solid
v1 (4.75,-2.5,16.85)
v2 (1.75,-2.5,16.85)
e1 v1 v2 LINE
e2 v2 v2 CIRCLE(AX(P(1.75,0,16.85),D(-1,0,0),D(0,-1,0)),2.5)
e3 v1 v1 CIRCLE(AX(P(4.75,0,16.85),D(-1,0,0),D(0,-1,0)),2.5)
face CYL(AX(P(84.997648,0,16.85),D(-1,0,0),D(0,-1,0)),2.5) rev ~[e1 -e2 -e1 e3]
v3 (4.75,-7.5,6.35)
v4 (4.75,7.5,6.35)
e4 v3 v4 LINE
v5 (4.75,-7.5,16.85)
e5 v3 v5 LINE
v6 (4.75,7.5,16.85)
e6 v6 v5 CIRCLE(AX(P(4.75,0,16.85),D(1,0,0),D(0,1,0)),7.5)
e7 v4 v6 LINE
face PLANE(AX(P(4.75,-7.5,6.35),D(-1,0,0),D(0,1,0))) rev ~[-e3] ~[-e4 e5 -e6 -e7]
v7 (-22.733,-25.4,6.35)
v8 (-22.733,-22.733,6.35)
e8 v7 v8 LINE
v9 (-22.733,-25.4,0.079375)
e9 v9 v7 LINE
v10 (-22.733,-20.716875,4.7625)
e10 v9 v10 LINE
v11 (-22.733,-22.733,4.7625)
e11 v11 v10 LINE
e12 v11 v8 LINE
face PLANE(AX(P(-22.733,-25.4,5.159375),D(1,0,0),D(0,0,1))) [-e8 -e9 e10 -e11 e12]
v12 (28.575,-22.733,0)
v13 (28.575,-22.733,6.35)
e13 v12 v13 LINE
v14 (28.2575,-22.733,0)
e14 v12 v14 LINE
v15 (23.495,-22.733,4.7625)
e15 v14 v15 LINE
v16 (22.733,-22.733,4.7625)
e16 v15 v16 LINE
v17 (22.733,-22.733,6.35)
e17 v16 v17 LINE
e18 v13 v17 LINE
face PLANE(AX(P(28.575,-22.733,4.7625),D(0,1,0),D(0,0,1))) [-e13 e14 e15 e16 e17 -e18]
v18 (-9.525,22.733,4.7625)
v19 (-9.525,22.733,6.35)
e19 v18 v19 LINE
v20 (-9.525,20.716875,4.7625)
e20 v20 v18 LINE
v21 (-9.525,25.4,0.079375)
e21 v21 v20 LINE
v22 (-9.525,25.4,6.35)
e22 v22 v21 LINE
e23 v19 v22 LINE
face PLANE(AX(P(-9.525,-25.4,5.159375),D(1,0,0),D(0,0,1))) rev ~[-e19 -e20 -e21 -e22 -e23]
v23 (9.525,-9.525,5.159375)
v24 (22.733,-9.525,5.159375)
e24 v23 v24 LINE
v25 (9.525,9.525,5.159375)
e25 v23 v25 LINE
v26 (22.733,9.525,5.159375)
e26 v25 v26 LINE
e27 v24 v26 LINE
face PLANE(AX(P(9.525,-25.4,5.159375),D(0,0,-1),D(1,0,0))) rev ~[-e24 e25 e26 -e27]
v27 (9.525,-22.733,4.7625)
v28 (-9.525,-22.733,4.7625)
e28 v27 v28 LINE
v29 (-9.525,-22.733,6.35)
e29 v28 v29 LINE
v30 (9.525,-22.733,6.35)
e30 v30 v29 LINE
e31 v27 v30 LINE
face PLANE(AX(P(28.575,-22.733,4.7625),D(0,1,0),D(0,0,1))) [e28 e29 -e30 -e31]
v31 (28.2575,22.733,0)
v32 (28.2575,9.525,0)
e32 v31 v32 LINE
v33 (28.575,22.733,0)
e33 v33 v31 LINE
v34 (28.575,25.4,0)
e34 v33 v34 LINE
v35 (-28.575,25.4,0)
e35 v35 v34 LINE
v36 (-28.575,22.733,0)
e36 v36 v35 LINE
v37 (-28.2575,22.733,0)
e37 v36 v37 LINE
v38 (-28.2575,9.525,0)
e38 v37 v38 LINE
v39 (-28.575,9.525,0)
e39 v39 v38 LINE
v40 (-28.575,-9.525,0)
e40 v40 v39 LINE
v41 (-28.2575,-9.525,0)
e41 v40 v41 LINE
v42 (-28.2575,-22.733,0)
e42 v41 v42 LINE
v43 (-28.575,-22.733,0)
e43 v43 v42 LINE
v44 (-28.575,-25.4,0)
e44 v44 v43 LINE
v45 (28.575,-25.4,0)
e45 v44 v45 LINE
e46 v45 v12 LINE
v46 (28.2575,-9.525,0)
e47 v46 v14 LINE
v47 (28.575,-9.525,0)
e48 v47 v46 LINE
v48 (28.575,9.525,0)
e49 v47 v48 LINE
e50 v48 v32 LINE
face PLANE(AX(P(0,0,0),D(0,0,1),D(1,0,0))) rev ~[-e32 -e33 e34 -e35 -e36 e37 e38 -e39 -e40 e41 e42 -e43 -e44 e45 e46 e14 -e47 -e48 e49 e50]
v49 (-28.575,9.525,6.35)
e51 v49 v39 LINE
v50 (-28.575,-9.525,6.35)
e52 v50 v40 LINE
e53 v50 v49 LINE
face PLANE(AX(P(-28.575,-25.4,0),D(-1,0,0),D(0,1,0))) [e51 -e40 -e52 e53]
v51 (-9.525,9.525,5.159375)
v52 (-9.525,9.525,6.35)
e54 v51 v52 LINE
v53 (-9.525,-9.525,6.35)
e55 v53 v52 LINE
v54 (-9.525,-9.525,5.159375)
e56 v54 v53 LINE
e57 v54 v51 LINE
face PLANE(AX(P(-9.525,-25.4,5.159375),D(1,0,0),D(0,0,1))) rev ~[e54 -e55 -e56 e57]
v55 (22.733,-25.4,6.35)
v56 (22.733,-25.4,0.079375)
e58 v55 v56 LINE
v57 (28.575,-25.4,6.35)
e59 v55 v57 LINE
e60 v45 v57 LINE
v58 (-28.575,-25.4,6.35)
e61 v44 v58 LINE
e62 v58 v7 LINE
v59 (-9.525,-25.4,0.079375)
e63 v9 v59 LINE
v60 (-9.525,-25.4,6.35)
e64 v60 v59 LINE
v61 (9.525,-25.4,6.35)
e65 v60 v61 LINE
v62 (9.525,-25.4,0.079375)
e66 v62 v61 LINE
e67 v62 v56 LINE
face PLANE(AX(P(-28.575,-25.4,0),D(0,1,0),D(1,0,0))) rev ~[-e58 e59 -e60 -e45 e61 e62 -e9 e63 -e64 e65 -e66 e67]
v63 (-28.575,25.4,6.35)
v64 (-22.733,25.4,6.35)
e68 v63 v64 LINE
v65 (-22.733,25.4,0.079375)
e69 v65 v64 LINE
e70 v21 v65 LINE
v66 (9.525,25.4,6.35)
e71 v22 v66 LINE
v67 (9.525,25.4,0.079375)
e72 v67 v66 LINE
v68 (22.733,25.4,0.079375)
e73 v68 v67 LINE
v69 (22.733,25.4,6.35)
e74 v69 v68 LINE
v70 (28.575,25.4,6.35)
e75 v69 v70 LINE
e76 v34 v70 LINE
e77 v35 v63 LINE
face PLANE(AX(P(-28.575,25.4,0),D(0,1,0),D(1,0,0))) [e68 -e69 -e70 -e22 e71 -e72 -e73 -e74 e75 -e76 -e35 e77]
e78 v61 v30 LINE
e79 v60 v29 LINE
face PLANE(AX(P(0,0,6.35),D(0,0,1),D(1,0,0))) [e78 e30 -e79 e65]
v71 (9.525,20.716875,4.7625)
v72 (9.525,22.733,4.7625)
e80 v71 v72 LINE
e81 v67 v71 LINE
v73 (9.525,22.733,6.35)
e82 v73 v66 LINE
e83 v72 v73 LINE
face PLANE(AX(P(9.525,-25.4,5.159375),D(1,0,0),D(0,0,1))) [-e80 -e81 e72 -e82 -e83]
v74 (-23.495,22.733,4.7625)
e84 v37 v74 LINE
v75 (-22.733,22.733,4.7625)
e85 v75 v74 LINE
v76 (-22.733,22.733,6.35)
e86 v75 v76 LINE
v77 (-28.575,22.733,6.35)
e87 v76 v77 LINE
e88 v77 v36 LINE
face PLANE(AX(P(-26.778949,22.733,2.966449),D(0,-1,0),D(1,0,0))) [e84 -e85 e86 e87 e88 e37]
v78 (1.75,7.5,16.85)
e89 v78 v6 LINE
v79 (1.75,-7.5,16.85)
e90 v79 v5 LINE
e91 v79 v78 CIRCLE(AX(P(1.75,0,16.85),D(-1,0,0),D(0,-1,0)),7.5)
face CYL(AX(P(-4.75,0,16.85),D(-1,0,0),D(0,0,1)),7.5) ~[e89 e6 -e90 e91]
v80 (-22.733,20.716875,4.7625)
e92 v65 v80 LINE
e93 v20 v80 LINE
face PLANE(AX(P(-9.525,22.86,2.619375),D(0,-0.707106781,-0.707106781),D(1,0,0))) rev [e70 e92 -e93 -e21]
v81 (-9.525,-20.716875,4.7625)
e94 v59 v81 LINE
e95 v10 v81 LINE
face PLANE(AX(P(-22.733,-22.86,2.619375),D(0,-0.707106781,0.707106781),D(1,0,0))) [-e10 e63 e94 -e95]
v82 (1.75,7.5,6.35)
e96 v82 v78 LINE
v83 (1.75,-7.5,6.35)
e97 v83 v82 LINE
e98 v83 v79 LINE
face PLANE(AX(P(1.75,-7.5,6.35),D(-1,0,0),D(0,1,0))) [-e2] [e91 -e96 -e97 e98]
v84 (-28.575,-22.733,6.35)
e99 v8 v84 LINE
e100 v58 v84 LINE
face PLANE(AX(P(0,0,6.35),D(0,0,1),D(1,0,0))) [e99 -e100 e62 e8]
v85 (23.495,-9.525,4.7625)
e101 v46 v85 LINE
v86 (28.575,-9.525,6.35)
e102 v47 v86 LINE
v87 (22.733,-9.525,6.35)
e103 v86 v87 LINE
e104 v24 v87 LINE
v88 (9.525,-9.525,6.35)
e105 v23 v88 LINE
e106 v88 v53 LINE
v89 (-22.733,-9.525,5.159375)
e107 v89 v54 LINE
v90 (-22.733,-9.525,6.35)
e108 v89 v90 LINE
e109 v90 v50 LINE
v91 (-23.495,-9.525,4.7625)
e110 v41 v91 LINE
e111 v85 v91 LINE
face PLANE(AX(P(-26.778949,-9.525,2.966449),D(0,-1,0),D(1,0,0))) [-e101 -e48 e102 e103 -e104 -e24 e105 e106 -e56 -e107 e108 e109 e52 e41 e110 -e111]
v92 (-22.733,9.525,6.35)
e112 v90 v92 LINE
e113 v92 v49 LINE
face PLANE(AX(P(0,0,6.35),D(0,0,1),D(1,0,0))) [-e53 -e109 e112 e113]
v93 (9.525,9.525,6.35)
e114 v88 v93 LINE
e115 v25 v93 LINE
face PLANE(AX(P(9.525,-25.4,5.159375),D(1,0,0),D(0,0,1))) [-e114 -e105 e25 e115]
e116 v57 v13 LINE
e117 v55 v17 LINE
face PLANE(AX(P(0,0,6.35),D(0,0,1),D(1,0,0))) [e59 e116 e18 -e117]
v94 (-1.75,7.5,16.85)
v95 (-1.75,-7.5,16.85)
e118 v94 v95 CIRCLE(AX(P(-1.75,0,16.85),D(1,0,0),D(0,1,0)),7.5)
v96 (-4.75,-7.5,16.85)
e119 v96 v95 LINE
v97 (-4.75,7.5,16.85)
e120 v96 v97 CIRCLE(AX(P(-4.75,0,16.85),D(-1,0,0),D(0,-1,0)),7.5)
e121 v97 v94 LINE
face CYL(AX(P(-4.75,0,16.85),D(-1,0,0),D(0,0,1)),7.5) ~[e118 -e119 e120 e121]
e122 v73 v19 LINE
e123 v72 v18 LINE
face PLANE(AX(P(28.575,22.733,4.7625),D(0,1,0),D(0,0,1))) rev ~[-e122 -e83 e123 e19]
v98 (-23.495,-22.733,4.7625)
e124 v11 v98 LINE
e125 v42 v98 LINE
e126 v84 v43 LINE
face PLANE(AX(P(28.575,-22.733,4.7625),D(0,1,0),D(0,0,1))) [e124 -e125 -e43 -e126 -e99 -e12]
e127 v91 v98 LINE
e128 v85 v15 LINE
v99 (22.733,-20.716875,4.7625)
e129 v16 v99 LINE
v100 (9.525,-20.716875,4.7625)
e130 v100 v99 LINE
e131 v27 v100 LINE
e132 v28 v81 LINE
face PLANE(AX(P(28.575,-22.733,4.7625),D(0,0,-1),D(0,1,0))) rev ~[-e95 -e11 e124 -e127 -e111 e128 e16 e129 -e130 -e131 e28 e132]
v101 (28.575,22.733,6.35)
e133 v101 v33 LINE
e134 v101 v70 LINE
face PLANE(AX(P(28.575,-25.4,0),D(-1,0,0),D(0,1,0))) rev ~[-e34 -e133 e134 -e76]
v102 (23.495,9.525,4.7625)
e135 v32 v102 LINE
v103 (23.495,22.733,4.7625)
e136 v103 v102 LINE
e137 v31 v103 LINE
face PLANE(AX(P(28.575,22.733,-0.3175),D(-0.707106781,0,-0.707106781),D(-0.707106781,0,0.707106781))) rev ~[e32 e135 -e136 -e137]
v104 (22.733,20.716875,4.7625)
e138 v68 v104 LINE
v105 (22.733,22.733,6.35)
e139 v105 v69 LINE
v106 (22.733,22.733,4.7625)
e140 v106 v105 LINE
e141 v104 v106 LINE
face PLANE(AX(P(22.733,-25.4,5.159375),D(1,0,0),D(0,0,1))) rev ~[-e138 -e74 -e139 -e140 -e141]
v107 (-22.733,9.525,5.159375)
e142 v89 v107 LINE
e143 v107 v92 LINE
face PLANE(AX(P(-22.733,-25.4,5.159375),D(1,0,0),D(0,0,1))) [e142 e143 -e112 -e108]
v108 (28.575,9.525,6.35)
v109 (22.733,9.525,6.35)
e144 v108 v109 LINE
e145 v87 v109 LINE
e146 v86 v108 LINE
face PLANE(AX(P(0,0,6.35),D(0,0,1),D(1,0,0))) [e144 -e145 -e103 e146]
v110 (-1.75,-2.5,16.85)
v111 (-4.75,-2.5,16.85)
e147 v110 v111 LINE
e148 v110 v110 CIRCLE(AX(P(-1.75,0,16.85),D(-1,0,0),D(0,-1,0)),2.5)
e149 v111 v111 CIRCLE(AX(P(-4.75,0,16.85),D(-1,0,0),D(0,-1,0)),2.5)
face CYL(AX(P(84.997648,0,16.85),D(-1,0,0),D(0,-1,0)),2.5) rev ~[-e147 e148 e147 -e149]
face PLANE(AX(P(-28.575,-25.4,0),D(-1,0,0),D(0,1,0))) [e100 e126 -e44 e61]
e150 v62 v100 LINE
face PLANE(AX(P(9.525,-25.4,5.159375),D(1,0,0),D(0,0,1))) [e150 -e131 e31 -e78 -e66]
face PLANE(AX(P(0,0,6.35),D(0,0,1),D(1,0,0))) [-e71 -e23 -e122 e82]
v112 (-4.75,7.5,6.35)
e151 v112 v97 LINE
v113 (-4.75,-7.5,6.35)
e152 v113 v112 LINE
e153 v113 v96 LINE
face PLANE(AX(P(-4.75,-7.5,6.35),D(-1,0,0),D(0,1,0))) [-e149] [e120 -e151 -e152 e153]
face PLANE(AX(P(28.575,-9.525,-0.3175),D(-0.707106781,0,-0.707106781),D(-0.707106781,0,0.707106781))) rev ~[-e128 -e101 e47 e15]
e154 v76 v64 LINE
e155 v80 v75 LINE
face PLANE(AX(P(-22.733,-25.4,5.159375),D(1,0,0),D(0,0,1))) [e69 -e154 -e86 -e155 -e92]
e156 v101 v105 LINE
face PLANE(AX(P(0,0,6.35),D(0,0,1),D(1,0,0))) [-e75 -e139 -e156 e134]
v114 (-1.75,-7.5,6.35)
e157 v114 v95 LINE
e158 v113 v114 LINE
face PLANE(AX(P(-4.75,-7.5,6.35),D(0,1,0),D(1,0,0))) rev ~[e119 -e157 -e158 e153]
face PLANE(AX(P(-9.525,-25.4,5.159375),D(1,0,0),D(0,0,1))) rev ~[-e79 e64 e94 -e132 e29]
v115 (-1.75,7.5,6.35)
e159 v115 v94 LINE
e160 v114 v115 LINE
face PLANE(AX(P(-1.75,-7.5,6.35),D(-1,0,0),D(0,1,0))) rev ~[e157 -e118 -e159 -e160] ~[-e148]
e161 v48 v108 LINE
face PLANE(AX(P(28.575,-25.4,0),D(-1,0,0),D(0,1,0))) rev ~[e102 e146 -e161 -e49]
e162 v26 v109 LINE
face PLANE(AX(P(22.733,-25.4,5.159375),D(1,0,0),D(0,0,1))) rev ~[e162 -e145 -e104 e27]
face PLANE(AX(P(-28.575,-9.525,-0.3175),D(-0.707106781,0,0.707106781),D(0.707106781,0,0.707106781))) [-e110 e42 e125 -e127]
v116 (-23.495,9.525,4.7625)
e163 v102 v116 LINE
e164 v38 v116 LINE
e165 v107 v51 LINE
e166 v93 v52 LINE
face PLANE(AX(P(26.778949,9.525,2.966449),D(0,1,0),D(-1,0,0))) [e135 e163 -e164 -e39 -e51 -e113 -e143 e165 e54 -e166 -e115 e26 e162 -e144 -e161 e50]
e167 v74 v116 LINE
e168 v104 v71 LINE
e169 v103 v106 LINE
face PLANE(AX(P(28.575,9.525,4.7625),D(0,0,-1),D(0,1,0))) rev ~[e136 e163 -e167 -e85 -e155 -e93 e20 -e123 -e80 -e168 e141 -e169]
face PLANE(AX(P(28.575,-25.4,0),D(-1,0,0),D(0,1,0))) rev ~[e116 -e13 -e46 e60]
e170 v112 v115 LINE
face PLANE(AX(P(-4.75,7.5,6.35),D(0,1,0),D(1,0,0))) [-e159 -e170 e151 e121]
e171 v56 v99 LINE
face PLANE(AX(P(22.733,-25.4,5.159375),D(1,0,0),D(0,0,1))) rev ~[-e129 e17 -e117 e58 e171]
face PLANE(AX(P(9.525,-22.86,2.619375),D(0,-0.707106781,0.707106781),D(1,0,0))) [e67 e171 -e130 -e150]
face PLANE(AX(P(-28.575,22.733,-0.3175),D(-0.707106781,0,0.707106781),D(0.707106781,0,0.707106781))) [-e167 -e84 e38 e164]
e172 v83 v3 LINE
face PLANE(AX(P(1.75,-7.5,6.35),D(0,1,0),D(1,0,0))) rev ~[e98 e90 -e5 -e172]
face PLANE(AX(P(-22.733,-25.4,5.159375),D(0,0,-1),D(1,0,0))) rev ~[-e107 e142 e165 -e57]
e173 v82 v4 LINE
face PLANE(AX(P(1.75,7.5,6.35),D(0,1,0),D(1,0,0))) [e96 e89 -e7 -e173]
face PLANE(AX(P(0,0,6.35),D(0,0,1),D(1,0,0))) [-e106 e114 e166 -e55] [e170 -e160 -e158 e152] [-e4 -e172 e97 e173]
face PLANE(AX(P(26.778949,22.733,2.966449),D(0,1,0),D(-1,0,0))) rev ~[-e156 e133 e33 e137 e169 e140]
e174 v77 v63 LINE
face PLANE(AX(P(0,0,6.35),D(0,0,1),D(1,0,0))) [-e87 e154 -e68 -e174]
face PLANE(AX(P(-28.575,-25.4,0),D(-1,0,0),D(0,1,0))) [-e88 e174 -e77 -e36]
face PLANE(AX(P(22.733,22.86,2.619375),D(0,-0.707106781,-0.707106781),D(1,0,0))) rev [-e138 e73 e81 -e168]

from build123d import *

# Parameters (mm, degrees)
F0_W         = 57.15
F0_H         = 50.8
F1_DEPTH     = 6.35
F2_W         = 13.208
F2_H         = 1.190625
F3_DEPTH     = 50.801
F4_SIZE      = 5.08
F5_W         = 3
F5_H         = 15
F6_DEPTH     = 18
F8_D         = 5
F9_W         = 13.208
F9_H         = 1.5875
F10_DEPTH    = 57.151
F11_T1_DEPTH = 13.208
F11_T3_DEPTH = 13.208
F13_DEPTH    = 33.326


# Not quite as in the source:
# - a fillet or chamfer that OpenCascade refuses, or shapes differently, is made with other operations: its cross-section is extruded or revolved along the edge and cut away or added


with BuildPart() as f1:
    # F0 (on Top) → F1 (new body)
    with BuildSketch(Plane.XY):
        Rectangle(F0_W, F0_H)
    extrude(amount=F1_DEPTH)

    # F2 (on face) → F3 (cut, through all)
    with BuildSketch(Plane.XZ.offset(25.4)):
        with Locations((-16.129, 5.7546875)):
            Rectangle(F2_W, F2_H)
        with Locations((16.129, 5.7546875)):
            Rectangle(F2_W, F2_H)
    extrude(amount=-F3_DEPTH, mode=Mode.SUBTRACT)

    # F4
    f4_edges = [f1.edges().sort_by_distance(p)[0] for p in [
        (-16.129, -25.4, 5.159375),
        (16.129, -25.4, 5.159375),
        (-16.129, 25.4, 5.159375),
        (16.129, 25.4, 5.159375),
    ]]
    chamfer(f4_edges, length=F4_SIZE)

    # F5 (on face) → F6 (join)
    with BuildSketch(Plane.XY.offset(6.35)):
        with Locations((-3.25, 0)):
            Rectangle(F5_W, F5_H)
        with Locations((3.25, 0)):
            Rectangle(F5_W, F5_H)
    extrude(amount=F6_DEPTH)

    # F8 (through all)
    with Locations(Plane.YZ.offset(4.75)):
        with Locations((0, 16.85)):
            Hole(F8_D / 2)

    # F9 (on face) → F10 (cut, through all)
    with BuildSketch(Plane.YZ.offset(28.575)):
        with Locations((-16.129, 5.55625)):
            Rectangle(F9_W, F9_H)
        with Locations((16.129, 5.55625)):
            Rectangle(F9_W, F9_H)
    extrude(amount=-F10_DEPTH, mode=Mode.SUBTRACT)

    # F11: chamfer of 5.08 on 4 edges, made by hand

    # F11_s2 → F11_t1 (cut)
    with BuildSketch(Plane.XZ.offset(-22.733)):
        Polygon((28.575, -0.3175), (23.495, 4.7625), (28.575, 4.7625), align=None)
        Polygon((-28.575, -0.3175), (-23.495, 4.7625), (-28.575, 4.7625), align=None)
    extrude(amount=F11_T1_DEPTH, mode=Mode.SUBTRACT)

    # F11_s4 → F11_t3 (cut)
    with BuildSketch(Plane.XZ.offset(9.525)):
        Polygon((28.575, -0.3175), (23.495, 4.7625), (28.575, 4.7625), align=None)
        Polygon((-28.575, -0.3175), (-23.495, 4.7625), (-28.575, 4.7625), align=None)
    extrude(amount=F11_T3_DEPTH, mode=Mode.SUBTRACT)

    # F12 (on face) → F13 (cut, through all)
    with BuildSketch(Plane(origin=(-4.75, 0, 0), x_dir=(0, -1, 0), z_dir=(-1, 0, 0))):
        with BuildLine():
            Line((-7.5, 24.35), (-7.5, 16.85))
            ThreePointArc((-7.5, 16.85), (-5.3033008589, 22.1533008589), (0, 24.35))
            Line((0, 24.35), (-7.5, 24.35))
        make_face()
        with BuildLine():
            Line((7.5, 24.35), (0, 24.35))
            ThreePointArc((0, 24.35), (5.3033008589, 22.1533008589), (7.5, 16.85))
            Line((7.5, 16.85), (7.5, 24.35))
        make_face()
    extrude(amount=-F13_DEPTH, mode=Mode.SUBTRACT)


solid = f1.part
